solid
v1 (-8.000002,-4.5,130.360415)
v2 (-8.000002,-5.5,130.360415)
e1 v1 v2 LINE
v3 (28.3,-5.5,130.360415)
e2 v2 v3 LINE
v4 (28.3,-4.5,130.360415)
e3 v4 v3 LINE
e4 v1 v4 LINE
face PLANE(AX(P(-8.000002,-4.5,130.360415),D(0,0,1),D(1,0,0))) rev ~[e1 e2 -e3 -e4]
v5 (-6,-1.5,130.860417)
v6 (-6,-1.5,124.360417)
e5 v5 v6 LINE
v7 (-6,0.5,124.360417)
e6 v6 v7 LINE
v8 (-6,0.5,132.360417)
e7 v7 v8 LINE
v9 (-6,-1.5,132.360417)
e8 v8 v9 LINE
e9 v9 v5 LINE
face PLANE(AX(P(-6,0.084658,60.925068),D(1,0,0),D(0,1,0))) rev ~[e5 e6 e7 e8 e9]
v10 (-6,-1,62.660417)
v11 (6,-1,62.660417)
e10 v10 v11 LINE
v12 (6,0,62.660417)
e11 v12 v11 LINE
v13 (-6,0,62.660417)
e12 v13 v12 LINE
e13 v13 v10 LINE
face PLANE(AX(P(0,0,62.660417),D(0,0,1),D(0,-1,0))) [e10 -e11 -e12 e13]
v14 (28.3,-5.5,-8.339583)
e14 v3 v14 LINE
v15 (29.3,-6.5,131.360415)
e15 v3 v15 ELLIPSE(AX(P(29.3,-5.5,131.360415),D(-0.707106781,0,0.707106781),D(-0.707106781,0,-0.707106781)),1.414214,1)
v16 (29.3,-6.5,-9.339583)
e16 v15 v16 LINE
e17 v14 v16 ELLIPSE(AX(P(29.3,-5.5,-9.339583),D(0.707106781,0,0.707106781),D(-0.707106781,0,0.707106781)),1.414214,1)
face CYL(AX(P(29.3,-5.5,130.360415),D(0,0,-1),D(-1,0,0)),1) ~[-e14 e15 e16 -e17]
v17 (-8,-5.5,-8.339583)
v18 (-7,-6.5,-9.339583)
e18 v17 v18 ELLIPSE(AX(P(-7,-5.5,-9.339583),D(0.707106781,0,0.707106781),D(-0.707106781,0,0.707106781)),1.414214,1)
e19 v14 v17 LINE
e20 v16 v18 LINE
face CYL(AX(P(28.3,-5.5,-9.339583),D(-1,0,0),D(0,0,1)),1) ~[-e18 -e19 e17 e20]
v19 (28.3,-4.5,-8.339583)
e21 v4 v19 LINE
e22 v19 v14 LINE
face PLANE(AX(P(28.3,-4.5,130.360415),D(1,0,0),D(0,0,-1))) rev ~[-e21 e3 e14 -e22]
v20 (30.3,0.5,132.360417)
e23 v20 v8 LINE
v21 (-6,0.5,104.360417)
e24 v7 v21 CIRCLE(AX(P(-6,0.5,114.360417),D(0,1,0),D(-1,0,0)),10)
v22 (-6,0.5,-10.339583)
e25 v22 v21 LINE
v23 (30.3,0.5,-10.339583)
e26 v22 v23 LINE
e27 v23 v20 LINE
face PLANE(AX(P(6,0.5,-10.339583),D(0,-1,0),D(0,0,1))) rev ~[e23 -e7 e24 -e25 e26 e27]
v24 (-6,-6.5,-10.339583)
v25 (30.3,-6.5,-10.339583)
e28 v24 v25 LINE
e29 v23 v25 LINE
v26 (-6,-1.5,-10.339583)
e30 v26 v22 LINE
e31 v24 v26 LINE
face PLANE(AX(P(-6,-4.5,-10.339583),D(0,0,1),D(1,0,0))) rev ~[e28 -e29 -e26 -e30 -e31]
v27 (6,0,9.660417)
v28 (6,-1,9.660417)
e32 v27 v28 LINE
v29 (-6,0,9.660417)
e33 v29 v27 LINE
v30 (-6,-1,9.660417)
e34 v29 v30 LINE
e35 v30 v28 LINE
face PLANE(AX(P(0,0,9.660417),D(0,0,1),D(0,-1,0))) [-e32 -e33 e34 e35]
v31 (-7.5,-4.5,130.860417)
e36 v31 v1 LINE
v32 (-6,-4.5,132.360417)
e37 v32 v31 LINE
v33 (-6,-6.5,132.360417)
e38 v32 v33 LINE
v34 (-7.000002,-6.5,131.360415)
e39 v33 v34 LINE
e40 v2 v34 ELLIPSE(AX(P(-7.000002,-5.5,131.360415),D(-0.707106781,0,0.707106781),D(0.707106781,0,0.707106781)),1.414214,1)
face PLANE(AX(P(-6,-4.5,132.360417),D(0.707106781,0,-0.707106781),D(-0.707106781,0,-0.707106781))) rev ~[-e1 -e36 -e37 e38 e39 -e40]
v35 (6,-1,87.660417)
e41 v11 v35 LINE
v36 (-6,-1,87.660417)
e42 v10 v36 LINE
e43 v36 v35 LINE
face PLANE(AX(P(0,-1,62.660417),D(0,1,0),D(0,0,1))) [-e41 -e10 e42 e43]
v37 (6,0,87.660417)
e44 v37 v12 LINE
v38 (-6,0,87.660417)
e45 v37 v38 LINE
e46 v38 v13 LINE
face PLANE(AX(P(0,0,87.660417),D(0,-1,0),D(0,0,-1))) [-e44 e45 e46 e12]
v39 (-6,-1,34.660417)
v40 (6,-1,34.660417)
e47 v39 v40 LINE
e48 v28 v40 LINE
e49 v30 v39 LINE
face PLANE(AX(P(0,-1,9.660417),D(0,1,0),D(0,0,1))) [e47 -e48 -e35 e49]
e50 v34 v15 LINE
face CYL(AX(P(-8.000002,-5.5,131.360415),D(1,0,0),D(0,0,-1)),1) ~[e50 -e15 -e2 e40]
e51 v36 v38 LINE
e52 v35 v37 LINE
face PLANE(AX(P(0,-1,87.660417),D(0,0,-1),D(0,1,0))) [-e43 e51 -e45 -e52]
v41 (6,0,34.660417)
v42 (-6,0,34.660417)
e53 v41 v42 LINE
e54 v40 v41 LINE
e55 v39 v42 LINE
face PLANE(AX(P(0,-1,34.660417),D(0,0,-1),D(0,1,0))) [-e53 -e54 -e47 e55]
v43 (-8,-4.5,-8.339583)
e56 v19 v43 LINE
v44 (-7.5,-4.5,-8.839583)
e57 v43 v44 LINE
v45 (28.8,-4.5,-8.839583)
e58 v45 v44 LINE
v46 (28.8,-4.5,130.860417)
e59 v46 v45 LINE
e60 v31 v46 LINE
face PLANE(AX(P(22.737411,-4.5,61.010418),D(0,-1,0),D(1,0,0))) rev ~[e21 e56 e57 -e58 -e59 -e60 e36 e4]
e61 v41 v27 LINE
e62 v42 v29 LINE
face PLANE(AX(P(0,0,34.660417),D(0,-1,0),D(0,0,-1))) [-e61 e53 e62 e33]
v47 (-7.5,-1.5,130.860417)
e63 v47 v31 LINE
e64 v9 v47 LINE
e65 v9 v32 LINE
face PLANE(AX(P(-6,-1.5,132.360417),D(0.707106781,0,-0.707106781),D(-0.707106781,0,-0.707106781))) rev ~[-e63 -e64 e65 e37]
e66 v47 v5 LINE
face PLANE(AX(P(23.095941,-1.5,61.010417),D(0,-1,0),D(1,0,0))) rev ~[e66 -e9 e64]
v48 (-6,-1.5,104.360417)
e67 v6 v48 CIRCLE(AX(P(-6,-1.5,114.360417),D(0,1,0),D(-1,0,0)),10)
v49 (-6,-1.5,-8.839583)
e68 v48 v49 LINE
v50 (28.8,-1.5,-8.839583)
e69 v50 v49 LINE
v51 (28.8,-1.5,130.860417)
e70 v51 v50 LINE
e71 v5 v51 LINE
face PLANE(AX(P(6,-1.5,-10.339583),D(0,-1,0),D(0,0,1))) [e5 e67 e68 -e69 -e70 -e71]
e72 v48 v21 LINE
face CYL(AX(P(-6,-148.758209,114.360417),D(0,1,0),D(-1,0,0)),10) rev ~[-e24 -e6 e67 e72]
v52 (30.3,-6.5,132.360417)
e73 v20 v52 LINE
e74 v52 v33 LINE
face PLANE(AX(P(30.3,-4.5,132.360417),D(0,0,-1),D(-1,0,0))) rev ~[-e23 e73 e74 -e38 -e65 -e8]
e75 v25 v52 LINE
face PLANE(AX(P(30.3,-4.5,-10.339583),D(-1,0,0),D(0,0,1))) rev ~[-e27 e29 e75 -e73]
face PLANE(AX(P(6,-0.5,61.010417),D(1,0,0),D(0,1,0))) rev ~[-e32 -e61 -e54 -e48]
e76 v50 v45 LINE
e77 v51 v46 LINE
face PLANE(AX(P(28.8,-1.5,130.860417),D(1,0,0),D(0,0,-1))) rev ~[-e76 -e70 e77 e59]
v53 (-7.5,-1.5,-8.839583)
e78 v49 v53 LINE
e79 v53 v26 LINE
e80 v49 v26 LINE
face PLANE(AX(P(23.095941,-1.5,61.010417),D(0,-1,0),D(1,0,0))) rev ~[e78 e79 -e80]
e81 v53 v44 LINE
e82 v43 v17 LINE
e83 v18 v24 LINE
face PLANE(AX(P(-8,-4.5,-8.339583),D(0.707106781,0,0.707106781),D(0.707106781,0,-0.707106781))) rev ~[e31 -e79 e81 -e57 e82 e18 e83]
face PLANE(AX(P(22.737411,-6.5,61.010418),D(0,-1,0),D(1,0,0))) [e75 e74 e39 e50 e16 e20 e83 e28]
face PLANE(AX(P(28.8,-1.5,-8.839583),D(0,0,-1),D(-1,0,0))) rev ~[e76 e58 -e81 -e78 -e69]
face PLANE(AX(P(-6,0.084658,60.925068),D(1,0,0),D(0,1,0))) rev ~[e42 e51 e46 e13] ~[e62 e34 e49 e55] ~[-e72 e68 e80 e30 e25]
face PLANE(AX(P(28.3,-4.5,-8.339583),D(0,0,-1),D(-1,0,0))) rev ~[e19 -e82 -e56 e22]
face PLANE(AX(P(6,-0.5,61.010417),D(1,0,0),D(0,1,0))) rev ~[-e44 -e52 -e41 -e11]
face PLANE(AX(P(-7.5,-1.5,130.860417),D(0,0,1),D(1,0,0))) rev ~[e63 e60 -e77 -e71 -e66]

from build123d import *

# Parameters (mm, degrees)
F1_DEPTH = 6
F2_W     = 2
F2_H     = 142.7
F3_DEPTH = 24.3
F5_D     = 20
F7_DEPTH = 3
F9_DEPTH = 2
F10_R    = 1


# Not quite as in the source:
# - ends of sketch curves that miss each other by under 0.0002 mm in the source are joined


with BuildPart() as f1:
    # F0 (on Right) → F1 (new body, symmetric)
    with BuildSketch(Plane.YZ):
        Polygon((0.5, -10.3395825443), (0.5, 132.3604174557), (-0.5, 132.3604174557), (-0.5, 87.6604174557), (0, 87.6604174557), (0, 62.6604174557), (-0.5, 62.6604174557), (-0.5, 34.6604174557), (0, 34.6604174557), (0, 9.6604174557), (-0.5, 9.6604174557), (-0.5, -10.3395825443), align=None)
        Polygon((-0.5, 87.6604174557), (-0.5, 132.3604174557), (-1.5, 132.3604174557), (-1.5, -10.3395825443), (-0.5, -10.3395825443), (-0.5, 9.6604174557), (-1, 9.6604174557), (-1, 34.6604174557), (-0.5, 34.6604174557), (-0.5, 62.6604174557), (-1, 62.6604174557), (-1, 87.6604174557), align=None)
    extrude(amount=F1_DEPTH, both=True)

    # F2 (on face) → F3 (join)
    with BuildSketch(Plane.YZ.offset(6)):
        with Locations((-0.5, 61.0104174557)):
            Rectangle(F2_W, F2_H)
    extrude(amount=F3_DEPTH)

    # F5 (through all)
    with Locations(Plane.XZ.offset(1.5)):
        with Locations((-6, 114.3604174557)):
            Hole(F5_D / 2)

    # F6 (on face) → F7 (join)
    with BuildSketch(Plane.XZ.offset(1.5)):
        Polygon((30.3, 132.3604174557), (-6, 132.3604174557), (-7.5, 130.8604174557), (28.8, 130.8604174557), (28.8, -8.8395825443), (-7.5, -8.8395825443), (-6, -10.3395825443), (30.3, -10.3395825443), align=None)
    extrude(amount=F7_DEPTH)

    # F8 (on face) → F9 (join)
    with BuildSketch(Plane.XZ.offset(4.5)):
        Polygon((-6, -10.3395825443), (30.3, -10.3395825443), (30.3, 132.3604174557), (-6, 132.3604174557), (-8.0000020331, 130.3604154225), (28.3, 130.3604154225), (28.3, -8.3395825443), (-8, -8.3395825443), align=None)
    extrude(amount=F9_DEPTH)

    # F10
    f10_edges = [f1.edges().sort_by_distance(p)[0] for p in [
        (10.15, -6.5, -8.339583),
        (28.3, -6.5, 61.010416),
        (10.149999, -6.5, 130.360415),
    ]]
    fillet(f10_edges, radius=F10_R)


solid = f1.part
